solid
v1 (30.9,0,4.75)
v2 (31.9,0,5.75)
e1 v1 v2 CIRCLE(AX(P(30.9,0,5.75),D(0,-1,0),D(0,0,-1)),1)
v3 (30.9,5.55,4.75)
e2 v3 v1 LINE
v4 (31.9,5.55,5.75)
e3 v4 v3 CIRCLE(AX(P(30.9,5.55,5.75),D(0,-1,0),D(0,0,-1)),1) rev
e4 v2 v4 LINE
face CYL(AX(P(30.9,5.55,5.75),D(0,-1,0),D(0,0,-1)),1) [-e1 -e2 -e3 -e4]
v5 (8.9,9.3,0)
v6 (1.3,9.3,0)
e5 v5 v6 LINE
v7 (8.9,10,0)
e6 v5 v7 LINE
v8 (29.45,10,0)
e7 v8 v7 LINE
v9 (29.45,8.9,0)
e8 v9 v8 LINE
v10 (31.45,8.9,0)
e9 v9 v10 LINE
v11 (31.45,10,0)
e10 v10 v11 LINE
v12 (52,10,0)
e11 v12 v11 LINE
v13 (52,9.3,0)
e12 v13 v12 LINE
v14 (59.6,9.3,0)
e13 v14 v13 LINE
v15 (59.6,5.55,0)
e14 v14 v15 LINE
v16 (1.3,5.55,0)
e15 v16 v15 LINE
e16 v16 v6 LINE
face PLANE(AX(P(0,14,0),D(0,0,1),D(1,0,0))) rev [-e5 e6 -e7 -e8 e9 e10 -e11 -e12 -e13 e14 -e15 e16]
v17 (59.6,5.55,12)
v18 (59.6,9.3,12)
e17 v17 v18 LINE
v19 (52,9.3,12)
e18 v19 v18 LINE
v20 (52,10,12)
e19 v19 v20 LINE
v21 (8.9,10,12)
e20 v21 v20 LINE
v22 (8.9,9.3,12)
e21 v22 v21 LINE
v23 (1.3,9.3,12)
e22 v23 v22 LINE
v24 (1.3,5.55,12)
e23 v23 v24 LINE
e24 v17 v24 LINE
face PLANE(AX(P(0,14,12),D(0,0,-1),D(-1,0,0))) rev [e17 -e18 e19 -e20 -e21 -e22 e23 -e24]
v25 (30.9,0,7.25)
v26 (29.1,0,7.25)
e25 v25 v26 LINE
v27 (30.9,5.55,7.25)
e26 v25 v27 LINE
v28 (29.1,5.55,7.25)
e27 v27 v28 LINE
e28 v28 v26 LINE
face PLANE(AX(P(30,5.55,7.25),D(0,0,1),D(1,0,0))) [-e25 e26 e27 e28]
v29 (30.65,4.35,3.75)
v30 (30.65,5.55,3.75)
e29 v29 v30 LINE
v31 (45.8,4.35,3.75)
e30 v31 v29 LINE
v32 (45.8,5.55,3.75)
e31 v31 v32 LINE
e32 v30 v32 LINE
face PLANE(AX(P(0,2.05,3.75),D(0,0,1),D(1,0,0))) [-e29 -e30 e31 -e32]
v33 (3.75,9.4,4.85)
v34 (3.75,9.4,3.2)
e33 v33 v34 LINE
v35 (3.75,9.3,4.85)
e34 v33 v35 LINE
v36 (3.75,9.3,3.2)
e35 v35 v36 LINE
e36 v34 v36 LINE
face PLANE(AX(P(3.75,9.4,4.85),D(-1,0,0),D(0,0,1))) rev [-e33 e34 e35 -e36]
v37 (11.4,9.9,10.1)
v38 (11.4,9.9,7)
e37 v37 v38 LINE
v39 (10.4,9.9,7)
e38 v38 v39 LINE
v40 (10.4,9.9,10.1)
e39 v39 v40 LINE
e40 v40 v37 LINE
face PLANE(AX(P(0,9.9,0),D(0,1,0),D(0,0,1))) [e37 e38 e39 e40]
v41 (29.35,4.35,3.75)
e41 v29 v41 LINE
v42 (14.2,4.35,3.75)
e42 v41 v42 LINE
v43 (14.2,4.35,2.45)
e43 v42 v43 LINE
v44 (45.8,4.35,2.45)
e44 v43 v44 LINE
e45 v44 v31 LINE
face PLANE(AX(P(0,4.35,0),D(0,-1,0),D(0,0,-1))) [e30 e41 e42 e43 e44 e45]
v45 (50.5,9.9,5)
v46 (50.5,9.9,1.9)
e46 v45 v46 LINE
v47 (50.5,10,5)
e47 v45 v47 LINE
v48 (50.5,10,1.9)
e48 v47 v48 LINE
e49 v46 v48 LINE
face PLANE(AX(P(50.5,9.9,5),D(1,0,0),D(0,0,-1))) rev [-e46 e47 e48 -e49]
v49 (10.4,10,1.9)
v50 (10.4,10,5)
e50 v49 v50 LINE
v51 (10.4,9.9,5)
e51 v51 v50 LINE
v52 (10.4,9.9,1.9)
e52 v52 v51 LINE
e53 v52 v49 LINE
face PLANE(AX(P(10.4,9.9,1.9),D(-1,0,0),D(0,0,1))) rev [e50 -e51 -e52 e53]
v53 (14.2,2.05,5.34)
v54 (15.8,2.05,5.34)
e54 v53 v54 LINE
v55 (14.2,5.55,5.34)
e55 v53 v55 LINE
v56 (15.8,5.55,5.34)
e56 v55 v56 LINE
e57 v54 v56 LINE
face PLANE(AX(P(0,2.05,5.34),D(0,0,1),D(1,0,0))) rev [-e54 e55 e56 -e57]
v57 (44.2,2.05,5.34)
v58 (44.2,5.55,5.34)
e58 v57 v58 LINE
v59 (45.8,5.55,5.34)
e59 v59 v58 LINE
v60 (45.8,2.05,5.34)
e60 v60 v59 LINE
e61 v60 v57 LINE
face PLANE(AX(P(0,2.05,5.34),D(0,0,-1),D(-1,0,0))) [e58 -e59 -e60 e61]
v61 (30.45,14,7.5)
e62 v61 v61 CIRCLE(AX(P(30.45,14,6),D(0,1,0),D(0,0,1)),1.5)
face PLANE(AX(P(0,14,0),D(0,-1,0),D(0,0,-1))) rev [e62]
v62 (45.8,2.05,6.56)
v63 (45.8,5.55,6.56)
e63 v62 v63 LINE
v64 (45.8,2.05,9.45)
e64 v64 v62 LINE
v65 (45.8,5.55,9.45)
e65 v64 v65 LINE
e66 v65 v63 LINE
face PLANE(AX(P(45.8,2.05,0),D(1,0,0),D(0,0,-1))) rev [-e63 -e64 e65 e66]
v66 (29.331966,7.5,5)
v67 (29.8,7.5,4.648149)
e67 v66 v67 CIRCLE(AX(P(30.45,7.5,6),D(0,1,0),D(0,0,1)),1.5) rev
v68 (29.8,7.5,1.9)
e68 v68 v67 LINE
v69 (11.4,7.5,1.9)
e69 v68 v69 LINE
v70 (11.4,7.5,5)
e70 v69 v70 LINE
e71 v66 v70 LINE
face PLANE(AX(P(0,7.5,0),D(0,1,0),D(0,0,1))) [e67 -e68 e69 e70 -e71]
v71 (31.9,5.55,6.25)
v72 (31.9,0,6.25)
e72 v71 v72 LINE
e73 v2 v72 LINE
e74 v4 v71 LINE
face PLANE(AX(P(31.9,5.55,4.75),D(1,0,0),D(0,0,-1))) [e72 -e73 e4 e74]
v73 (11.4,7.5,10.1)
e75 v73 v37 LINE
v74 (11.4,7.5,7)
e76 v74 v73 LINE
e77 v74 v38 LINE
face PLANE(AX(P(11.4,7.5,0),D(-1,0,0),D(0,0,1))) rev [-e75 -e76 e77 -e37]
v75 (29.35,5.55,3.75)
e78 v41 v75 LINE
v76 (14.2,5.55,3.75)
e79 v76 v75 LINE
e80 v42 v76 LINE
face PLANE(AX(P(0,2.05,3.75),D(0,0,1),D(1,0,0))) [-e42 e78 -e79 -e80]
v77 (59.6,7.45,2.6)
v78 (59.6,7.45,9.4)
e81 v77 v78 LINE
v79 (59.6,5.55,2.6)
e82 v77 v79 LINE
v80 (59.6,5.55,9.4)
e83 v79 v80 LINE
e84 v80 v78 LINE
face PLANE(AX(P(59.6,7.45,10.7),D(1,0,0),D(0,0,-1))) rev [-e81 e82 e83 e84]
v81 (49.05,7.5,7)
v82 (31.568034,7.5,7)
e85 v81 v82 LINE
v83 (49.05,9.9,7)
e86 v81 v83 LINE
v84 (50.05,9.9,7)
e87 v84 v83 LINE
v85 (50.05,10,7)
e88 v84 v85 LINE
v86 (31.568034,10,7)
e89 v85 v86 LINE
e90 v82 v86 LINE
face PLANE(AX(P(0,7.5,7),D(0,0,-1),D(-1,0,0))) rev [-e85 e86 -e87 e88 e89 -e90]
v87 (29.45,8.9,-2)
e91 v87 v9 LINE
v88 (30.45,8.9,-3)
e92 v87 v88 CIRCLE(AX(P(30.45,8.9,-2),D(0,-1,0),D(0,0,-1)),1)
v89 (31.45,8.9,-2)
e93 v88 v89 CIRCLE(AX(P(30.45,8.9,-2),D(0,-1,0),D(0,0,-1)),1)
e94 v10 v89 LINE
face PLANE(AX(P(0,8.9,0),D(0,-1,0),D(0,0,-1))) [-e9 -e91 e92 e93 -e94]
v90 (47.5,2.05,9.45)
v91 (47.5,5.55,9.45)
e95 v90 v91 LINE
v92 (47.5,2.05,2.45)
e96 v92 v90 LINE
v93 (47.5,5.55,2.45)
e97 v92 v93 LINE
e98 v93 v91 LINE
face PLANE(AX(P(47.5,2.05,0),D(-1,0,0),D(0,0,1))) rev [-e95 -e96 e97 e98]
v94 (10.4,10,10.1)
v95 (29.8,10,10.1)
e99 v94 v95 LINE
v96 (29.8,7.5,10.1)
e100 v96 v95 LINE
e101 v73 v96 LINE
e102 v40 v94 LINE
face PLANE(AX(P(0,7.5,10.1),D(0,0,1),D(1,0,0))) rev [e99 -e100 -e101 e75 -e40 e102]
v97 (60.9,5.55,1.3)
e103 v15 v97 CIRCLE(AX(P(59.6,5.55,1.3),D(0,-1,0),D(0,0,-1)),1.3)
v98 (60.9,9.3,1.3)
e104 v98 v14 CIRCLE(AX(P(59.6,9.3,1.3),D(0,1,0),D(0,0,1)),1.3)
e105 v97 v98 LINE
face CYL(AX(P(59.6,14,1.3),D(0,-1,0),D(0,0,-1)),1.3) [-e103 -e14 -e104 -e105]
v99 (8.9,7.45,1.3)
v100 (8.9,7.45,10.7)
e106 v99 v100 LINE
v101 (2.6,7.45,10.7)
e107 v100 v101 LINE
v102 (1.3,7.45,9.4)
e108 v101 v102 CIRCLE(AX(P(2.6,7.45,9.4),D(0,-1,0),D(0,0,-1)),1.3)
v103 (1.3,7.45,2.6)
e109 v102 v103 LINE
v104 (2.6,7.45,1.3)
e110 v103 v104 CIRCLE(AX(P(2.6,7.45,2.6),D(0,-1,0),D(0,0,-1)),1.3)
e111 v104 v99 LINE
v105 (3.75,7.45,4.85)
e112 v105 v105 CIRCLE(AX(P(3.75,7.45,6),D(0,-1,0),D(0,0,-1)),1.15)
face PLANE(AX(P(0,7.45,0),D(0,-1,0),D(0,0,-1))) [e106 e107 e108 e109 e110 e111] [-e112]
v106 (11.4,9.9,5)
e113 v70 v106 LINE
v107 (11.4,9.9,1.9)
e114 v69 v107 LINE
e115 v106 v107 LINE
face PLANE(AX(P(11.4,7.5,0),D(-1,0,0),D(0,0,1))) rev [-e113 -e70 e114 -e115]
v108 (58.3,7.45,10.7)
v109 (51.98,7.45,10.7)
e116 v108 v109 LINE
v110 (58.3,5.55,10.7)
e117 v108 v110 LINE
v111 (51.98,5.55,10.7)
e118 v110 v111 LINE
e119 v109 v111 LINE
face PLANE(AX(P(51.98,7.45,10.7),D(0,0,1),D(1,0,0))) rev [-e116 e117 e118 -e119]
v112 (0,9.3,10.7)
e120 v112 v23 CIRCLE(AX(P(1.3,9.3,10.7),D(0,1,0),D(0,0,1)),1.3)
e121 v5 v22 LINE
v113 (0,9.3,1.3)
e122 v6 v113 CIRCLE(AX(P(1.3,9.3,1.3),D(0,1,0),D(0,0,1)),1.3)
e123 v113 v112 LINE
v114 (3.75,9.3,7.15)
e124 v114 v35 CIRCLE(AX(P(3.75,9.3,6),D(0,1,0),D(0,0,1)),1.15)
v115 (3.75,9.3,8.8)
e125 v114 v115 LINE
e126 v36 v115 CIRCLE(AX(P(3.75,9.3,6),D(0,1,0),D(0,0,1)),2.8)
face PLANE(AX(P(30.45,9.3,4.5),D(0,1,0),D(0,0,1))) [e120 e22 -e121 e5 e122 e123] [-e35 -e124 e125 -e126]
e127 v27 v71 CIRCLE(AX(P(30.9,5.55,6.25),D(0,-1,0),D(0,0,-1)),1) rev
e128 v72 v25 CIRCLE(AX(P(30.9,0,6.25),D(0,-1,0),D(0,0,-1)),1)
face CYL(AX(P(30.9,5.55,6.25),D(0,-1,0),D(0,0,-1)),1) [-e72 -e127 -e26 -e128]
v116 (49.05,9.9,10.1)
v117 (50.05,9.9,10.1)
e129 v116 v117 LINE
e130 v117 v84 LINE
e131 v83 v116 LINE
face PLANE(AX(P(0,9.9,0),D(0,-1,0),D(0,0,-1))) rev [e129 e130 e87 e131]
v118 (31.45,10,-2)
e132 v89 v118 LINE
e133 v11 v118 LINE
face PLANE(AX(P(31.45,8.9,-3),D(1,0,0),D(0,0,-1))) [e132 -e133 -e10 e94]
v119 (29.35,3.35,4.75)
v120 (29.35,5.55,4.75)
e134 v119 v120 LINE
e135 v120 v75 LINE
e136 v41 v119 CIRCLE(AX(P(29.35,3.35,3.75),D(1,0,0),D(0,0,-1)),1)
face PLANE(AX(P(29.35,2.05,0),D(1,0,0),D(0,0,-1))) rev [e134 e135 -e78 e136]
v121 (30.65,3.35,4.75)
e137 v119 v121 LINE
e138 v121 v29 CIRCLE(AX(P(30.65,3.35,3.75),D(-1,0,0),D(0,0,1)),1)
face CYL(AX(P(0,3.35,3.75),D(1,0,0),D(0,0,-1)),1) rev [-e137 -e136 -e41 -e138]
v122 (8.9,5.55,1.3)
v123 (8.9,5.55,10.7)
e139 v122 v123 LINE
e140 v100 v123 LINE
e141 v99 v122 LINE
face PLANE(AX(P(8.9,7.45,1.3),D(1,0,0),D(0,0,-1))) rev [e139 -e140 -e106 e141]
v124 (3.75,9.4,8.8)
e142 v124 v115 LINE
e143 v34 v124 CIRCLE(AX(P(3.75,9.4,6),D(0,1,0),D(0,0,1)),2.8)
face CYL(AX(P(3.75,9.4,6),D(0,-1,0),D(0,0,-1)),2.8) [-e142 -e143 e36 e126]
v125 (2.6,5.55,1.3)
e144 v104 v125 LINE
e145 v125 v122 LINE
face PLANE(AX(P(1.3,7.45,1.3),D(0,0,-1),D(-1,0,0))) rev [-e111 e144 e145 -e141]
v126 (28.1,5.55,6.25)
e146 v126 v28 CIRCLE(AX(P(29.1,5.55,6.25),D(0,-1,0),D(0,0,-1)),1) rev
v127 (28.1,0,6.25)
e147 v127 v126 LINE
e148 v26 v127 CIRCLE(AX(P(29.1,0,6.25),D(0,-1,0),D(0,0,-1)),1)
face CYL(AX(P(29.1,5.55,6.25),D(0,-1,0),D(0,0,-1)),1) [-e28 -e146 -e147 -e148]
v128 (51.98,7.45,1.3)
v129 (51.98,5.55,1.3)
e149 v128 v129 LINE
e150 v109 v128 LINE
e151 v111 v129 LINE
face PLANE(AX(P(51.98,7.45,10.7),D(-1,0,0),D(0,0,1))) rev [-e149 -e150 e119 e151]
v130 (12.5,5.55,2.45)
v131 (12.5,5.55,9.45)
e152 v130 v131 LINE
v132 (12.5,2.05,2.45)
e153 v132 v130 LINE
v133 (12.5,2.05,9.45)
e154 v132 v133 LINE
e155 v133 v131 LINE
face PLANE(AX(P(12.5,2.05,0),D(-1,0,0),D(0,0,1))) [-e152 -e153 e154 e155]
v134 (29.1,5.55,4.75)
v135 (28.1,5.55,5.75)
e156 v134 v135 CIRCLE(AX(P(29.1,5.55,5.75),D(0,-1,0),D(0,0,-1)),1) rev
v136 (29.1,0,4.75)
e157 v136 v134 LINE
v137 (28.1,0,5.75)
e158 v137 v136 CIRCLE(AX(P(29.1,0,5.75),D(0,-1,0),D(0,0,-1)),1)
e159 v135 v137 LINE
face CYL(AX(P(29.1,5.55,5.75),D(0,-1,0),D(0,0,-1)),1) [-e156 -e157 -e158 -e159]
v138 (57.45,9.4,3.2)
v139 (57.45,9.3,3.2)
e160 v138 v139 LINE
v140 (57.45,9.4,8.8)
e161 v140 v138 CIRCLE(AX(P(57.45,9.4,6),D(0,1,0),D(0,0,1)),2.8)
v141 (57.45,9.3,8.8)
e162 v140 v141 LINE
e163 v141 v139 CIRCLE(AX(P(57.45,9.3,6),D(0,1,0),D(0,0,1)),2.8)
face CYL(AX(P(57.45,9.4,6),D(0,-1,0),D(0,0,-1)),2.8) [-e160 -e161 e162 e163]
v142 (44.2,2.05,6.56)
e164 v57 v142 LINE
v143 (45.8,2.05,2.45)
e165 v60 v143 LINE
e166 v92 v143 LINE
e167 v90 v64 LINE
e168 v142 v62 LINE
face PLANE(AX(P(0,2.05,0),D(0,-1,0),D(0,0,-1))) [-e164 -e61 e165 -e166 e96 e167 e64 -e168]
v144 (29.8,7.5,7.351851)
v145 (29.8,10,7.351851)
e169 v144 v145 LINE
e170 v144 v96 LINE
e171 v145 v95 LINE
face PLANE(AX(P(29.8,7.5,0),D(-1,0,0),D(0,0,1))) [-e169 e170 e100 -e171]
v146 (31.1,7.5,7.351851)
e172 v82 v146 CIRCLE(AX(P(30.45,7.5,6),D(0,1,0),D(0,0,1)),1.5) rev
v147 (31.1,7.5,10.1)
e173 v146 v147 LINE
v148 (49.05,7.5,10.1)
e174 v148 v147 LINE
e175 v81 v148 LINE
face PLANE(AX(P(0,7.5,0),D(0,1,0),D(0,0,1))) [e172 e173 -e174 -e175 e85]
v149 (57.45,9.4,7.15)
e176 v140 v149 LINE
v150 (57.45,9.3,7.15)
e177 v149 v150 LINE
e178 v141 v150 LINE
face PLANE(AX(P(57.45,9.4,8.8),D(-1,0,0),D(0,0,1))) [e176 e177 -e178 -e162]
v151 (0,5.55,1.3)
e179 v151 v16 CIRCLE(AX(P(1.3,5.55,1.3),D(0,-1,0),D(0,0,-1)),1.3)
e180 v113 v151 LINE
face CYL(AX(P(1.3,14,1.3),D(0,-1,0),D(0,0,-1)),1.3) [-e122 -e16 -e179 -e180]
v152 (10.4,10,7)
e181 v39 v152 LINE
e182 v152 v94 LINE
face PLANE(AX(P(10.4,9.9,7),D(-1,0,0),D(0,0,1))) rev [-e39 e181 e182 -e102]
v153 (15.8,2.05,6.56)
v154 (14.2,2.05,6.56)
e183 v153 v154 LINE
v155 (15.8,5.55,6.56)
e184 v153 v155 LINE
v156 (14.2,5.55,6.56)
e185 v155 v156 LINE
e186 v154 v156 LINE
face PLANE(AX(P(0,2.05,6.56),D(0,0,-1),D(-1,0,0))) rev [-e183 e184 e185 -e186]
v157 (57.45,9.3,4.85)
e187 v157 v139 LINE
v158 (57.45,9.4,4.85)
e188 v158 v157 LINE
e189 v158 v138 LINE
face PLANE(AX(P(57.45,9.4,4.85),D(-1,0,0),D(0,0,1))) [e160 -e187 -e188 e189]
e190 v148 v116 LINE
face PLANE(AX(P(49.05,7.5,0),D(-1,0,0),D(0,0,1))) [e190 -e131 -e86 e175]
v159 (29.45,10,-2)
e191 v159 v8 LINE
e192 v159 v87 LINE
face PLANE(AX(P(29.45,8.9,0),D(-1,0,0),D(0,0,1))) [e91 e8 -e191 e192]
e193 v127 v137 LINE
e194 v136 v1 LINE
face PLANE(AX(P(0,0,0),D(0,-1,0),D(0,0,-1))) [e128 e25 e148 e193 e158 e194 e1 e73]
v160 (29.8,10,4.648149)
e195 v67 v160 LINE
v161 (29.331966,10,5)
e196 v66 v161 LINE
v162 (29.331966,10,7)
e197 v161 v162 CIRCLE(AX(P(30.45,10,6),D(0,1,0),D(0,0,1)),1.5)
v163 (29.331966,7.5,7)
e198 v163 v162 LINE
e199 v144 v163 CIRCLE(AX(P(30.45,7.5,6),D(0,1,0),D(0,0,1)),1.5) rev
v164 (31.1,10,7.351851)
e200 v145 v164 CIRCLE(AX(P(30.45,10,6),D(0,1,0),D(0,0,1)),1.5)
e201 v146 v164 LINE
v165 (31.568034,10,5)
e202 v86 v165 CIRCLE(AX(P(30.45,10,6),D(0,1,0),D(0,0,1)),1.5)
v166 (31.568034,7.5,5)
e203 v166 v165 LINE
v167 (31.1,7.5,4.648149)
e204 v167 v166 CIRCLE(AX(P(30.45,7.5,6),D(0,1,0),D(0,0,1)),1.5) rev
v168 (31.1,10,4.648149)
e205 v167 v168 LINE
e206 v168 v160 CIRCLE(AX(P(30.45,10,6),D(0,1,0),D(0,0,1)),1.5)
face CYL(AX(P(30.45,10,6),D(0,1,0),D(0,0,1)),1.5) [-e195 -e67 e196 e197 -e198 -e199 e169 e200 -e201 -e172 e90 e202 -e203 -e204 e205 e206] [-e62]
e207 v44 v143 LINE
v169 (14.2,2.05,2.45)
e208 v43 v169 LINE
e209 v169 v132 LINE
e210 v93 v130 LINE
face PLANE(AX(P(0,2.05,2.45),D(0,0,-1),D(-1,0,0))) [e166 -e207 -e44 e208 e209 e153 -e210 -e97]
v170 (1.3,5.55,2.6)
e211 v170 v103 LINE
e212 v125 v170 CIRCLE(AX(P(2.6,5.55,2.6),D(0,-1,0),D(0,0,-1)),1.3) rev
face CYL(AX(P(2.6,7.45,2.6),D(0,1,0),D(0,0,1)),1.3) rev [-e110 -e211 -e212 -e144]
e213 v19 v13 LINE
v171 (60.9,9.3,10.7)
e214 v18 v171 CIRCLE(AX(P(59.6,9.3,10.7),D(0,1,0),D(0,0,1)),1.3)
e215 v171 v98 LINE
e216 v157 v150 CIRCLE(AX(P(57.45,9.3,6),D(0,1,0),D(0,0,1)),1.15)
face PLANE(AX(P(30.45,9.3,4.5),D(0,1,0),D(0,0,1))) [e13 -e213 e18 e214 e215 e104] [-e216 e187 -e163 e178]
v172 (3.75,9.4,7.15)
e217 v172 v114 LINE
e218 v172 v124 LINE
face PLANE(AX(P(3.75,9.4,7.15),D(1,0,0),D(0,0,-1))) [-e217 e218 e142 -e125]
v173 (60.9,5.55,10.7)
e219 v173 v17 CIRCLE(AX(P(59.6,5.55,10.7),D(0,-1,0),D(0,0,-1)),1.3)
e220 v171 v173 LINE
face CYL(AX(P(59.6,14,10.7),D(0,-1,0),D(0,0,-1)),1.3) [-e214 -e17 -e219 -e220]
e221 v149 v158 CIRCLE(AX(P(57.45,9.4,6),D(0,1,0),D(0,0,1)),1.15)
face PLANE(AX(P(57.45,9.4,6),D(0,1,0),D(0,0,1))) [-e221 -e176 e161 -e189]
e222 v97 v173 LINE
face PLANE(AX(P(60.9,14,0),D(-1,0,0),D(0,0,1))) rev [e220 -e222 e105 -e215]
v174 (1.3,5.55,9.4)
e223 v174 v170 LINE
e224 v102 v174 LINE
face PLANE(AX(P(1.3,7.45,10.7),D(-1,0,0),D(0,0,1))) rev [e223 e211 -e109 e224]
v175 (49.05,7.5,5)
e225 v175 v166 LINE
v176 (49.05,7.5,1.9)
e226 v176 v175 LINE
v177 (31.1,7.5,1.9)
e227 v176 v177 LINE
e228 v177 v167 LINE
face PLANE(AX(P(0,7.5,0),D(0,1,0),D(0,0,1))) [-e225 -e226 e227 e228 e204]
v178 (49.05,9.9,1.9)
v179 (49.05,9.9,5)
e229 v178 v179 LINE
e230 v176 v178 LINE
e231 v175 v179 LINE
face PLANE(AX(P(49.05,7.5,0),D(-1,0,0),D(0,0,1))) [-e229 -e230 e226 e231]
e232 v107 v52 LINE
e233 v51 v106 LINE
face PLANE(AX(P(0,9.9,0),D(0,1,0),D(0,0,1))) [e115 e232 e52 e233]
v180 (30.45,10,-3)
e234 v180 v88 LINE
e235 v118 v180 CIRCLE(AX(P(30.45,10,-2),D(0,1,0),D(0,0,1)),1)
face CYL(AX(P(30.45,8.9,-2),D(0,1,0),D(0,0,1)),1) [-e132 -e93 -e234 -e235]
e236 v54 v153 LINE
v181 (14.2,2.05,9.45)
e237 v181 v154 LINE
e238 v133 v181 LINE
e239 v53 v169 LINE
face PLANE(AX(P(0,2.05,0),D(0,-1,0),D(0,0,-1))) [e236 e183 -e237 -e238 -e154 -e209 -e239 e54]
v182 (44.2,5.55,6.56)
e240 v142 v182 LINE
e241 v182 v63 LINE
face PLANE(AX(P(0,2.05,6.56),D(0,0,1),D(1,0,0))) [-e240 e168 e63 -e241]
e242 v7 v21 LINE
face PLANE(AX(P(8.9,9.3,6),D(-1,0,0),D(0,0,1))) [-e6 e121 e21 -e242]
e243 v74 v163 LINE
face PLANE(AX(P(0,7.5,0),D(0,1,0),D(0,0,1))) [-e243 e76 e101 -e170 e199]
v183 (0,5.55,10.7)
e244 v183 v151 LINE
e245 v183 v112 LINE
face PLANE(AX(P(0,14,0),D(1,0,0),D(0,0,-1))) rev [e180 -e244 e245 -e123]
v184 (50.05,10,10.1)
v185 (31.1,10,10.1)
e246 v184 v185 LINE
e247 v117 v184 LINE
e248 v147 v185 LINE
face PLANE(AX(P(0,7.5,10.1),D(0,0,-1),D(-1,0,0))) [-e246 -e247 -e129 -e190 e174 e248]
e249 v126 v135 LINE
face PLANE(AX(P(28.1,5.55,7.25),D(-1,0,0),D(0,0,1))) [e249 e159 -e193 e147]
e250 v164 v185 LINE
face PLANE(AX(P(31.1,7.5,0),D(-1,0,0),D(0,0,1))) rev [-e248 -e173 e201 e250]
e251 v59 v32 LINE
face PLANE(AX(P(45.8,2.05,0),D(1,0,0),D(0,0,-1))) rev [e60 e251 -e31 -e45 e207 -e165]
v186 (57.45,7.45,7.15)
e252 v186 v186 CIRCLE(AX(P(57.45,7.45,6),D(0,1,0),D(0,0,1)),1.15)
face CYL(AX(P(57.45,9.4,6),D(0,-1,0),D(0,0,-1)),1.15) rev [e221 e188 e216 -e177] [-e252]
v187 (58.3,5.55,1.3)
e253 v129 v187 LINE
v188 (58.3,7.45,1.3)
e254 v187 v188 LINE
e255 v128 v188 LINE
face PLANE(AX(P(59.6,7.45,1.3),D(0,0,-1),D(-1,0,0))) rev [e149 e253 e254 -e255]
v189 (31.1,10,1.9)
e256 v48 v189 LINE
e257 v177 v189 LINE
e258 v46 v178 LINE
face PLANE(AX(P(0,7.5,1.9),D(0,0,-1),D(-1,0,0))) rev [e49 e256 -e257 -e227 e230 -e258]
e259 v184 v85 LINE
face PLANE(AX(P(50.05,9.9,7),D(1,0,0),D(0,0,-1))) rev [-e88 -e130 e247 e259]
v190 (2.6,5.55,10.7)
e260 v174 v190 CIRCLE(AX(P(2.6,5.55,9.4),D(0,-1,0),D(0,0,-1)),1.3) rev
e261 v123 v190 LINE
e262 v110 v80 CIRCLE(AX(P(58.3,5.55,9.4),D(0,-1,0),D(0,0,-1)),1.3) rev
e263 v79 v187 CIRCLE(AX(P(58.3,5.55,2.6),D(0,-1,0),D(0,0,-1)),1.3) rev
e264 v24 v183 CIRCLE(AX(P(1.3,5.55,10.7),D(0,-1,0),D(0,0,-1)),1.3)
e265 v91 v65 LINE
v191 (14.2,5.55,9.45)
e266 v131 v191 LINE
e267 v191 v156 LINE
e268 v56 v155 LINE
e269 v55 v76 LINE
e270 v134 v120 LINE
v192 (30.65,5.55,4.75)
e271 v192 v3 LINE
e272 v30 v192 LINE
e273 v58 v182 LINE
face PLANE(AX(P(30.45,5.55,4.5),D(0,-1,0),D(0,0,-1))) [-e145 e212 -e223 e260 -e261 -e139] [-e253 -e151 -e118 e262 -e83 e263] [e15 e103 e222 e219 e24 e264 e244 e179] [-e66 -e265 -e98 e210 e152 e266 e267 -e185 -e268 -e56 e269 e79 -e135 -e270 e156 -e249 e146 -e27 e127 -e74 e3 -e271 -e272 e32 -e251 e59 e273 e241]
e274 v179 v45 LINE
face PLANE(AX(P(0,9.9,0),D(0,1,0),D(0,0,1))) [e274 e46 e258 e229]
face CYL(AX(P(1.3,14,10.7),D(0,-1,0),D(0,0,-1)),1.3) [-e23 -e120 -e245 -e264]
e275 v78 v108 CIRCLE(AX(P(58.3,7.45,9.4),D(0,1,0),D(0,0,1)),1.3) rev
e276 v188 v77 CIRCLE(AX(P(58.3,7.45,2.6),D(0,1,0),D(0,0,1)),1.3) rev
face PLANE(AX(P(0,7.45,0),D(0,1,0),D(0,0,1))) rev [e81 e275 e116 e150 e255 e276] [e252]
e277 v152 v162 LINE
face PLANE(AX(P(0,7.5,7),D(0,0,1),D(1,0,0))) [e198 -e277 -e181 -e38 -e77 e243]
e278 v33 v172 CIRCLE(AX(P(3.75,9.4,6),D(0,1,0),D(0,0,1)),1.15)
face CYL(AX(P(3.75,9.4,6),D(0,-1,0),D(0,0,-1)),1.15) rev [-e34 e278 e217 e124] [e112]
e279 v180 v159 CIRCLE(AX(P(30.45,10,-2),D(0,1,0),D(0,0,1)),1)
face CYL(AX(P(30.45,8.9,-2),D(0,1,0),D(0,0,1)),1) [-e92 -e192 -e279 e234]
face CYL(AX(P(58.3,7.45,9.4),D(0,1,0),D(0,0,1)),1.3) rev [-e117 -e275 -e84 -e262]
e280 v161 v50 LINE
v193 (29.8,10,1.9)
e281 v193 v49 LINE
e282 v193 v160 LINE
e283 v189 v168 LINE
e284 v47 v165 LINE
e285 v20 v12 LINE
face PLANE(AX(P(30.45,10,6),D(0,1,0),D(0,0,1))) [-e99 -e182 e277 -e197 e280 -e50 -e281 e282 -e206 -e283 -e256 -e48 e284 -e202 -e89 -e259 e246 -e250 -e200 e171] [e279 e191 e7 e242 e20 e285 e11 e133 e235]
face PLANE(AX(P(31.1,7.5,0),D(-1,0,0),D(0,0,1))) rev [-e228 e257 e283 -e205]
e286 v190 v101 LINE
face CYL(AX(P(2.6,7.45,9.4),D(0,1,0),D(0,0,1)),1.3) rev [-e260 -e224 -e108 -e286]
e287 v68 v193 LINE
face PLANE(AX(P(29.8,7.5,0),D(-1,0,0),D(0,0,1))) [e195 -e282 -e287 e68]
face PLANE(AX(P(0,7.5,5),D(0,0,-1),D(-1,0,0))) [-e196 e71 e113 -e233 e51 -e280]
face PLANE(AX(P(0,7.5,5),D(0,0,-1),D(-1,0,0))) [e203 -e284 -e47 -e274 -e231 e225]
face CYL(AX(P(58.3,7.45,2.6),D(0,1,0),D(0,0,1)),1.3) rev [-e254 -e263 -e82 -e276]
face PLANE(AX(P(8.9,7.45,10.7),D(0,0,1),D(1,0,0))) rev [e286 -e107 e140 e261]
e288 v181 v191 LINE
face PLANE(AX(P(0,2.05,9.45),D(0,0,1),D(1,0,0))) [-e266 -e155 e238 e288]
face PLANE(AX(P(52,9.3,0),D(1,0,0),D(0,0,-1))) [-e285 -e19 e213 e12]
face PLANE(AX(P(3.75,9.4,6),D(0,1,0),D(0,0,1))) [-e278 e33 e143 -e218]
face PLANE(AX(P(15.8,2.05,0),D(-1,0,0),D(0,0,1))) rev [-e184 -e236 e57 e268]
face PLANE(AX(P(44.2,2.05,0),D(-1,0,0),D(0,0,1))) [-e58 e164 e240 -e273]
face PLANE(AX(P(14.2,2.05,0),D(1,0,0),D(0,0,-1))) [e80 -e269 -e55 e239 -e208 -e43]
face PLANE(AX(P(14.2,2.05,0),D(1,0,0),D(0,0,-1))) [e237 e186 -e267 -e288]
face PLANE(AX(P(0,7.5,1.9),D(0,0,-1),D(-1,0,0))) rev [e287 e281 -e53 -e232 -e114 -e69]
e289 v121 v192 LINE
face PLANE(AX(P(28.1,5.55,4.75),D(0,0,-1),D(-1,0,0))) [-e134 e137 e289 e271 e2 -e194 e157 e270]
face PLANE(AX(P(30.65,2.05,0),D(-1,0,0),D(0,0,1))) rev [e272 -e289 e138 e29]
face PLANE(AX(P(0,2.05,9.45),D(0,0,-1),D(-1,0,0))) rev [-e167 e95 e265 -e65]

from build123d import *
from build123d.topology import SkipClean

# Parameters (mm, degrees)
CROQUIS1_W              = 60.9
CROQUIS1_H              = 12
SALIENTE_EXTRUIR1_DEPTH = 14
CROQUIS2_OUTSIDE_W      = 75.626
CROQUIS2_OUTSIDE_H      = 26.726
CROQUIS2_OUTSIDE_R      = 1.5
CORTAR_EXTRUIR1_DEPTH   = 4
SALIENTE_EXTRUIR3_DEPTH = 1.1
CROQUIS4_OUTSIDE_W      = 75.752
CROQUIS4_OUTSIDE_H      = 29.852
CORTAR_EXTRUIR2_DEPTH   = 0.7
CORTAR_EXTRUIR3_DEPTH   = 2.5
CROQUIS6_W              = 1.45
CROQUIS6_H              = 3.1
CROQUIS6_W_2            = 1
CORTAR_EXTRUIR4_DEPTH   = 0.1
REDONDEO1_R             = 1
REDONDEO2_R             = 1
SALIENTE_EXTRUIR4_DEPTH = 0.1
CORTAR_EXTRUIR5_REACH   = 64.764
CROQUIS8_R              = 1.15
CROQUIS9_OUTSIDE_W      = 75.752
CROQUIS9_OUTSIDE_H      = 29.852
CORTAR_EXTRUIR7_DEPTH   = 5.55
SALIENTE_EXTRUIR6_DEPTH = 3.5
CROQUIS12_W             = 31.6
CROQUIS12_H             = 1.3
CORTAR_EXTRUIR8_DEPTH   = 2.3
CROQUIS14_W             = 1.3
CROQUIS14_H             = 1
CORTAR_EXTRUIR9_DEPTH   = 2.3
REDONDEO3_R             = 1
CROQUIS15_W             = 7.62
CROQUIS15_H             = 9.4
CROQUIS15_W_2           = 7.6
CORTAR_EXTRUIR10_DEPTH  = 1.9
REDONDEO4_R             = 1.3
REDONDEO5_R             = 1.3
REDONDEO6_R             = 1.3
REDONDEO7_R             = 1


# Some blends are built 0.0001 mm under size
with BuildPart() as part:
    # Croquis1 → Saliente-Extruir1 (new body)
    with BuildSketch(Plane(origin=(0, 0, 0), x_dir=(1, 0, 0), z_dir=(0, 1, 0))):
        with Locations((30.45, -6)):
            Rectangle(CROQUIS1_W, CROQUIS1_H)
    extrude(amount=SALIENTE_EXTRUIR1_DEPTH)

    # Croquis2 outside → Cortar-Extruir1 (cut)
    with BuildSketch(Plane(origin=(0, 14, 0), x_dir=(1, 0, 0), z_dir=(0, 1, 0))):
        with Locations((30.45, -6)):
            Rectangle(CROQUIS2_OUTSIDE_W, CROQUIS2_OUTSIDE_H)
        with Locations(Location((30.45, -6, 0), (0, 0, 270))):
            Circle(CROQUIS2_OUTSIDE_R, mode=Mode.SUBTRACT)
    extrude(amount=-CORTAR_EXTRUIR1_DEPTH, mode=Mode.SUBTRACT)

    # Croquis3 → Saliente-Extruir3 (add)
    with BuildSketch(Plane(origin=(0, 10, 0), x_dir=(1, 0, 0), z_dir=(0, 1, 0))):
        Polygon((30.45, 0), (29.45, 0), (29.45, 3), (31.45, 3), (31.45, 0), align=None)
    extrude(amount=-SALIENTE_EXTRUIR3_DEPTH)

    # Croquis4 outside → Cortar-Extruir2 (cut)
    with BuildSketch(Plane(origin=(0, 10, 0), x_dir=(1, 0, 0), z_dir=(0, 1, 0))):
        with Locations((30.45, -4.5)):
            Rectangle(CROQUIS4_OUTSIDE_W, CROQUIS4_OUTSIDE_H)
        Polygon((8.9, -6), (8.9, 0), (29.45, 0), (29.45, 3), (31.45, 3), (31.45, 0), (52, 0), (52, -12), (8.9, -12), align=None, mode=Mode.SUBTRACT)
    extrude(amount=-CORTAR_EXTRUIR2_DEPTH, mode=Mode.SUBTRACT)

    # Croquis5 → Cortar-Extruir3 (cut)
    with SkipClean():  # the faces are left unmerged after this step: merging them gives an invalid solid
        with BuildSketch(Plane(origin=(0, 10, 0), x_dir=(1, 0, 0), z_dir=(0, 1, 0))):
            with BuildLine():
                ThreePointArc((29.331966011, -5), (29.548647819, -4.801015327), (29.8, -4.648149417))
                Line((29.8, -4.648149417), (29.8, -1.9))
                Line((29.8, -1.9), (11.4, -1.9))
                Line((11.4, -1.9), (11.4, -5))
                Line((11.4, -5), (29.331966011, -5))
            make_face()
            with BuildLine():
                ThreePointArc((29.8, -7.351850583), (29.548647819, -7.198984673), (29.331966011, -7))
                Line((29.331966011, -7), (11.4, -7))
                Line((11.4, -7), (11.4, -10.1))
                Line((11.4, -10.1), (29.8, -10.1))
                Line((29.8, -10.1), (29.8, -7.351850583))
            make_face()
            with BuildLine():
                Line((49.05, -7), (31.568033989, -7))
                ThreePointArc((31.568033989, -7), (31.351352181, -7.198984673), (31.1, -7.351850583))
                Line((31.1, -7.351850583), (31.1, -10.1))
                Line((31.1, -10.1), (49.05, -10.1))
                Line((49.05, -10.1), (49.05, -7))
            make_face()
            with BuildLine():
                Line((49.05, -5), (49.05, -1.9))
                Line((49.05, -1.9), (31.1, -1.9))
                Line((31.1, -1.9), (31.1, -4.648149417))
                ThreePointArc((31.1, -4.648149417), (31.351352181, -4.801015327), (31.568033989, -5))
                Line((31.568033989, -5), (49.05, -5))
            make_face()
        extrude(amount=-CORTAR_EXTRUIR3_DEPTH, mode=Mode.SUBTRACT)

    # Croquis6 → Cortar-Extruir4 (cut)
    with SkipClean():  # the faces are left unmerged after this step: merging them gives an invalid solid
        with BuildSketch(Plane(origin=(0, 10, 0), x_dir=(1, 0, 0), z_dir=(0, 1, 0))):
            with Locations((49.775, -3.45)):
                Rectangle(CROQUIS6_W, CROQUIS6_H)
            with Locations((49.55, -8.55)):
                Rectangle(CROQUIS6_W_2, CROQUIS6_H)
            with Locations((10.9, -3.45)):
                Rectangle(CROQUIS6_W_2, CROQUIS6_H)
            with Locations((10.9, -8.55)):
                Rectangle(CROQUIS6_W_2, CROQUIS6_H)
        extrude(amount=-CORTAR_EXTRUIR4_DEPTH, mode=Mode.SUBTRACT)

    # Redondeo1
    redondeo1_edges = [part.edges().sort_by_distance(p)[0] for p in [
        (31.45, 9.45, -3),
    ]]
    fillet(redondeo1_edges, radius=REDONDEO1_R)

    # Redondeo2
    redondeo2_edges = [part.edges().sort_by_distance(p)[0] for p in [
        (29.45, 9.45, -3),
    ]]
    fillet(redondeo2_edges, radius=REDONDEO2_R - 0.0001)  # a hair under: the kernel refuses the full size

    # Croquis7 → Saliente-Extruir4 (add)
    with BuildSketch(Plane(origin=(0, 9.3, 0), x_dir=(1, 0, 0), z_dir=(0, 1, 0))):
        with BuildLine():
            Line((57.45, -8.8), (57.45, -7.15))
            ThreePointArc((57.45, -7.15), (58.6, -6), (57.45, -4.85))
            Line((57.45, -4.85), (57.45, -3.2))
            ThreePointArc((57.45, -3.2), (60.25, -6), (57.45, -8.8))
        make_face()
        with BuildLine():
            Line((3.75, -4.85), (3.75, -3.2))
            ThreePointArc((3.75, -3.2), (0.95, -6), (3.75, -8.8))
            Line((3.75, -8.8), (3.75, -7.15))
            ThreePointArc((3.75, -7.15), (2.6, -6), (3.75, -4.85))
        make_face()
    extrude(amount=SALIENTE_EXTRUIR4_DEPTH)

    # Croquis8 → Cortar-Extruir5 (cut, up to next)
    with BuildSketch(Plane(origin=(0, 9.3, 0), x_dir=(1, 0, 0), z_dir=(0, 1, 0)), mode=Mode.PRIVATE) as cortar_extruir5_sk1:
        with Locations(Location((57.45, -6, 0), (0, 0, 90))):
            Circle(CROQUIS8_R)
    cortar_extruir5_tool1 = extrude(cortar_extruir5_sk1.sketch, amount=-CORTAR_EXTRUIR5_REACH, mode=Mode.PRIVATE) & part.part
    # Croquis8 → Cortar-Extruir5 (cut, up to next)
    with BuildSketch(Plane(origin=(0, 9.3, 0), x_dir=(1, 0, 0), z_dir=(0, 1, 0)), mode=Mode.PRIVATE) as cortar_extruir5_sk2:
        with Locations(Location((3.75, -6, 0), (0, 0, 90))):
            Circle(CROQUIS8_R)
    cortar_extruir5_tool2 = extrude(cortar_extruir5_sk2.sketch, amount=-CORTAR_EXTRUIR5_REACH, mode=Mode.PRIVATE) & part.part
    add(cortar_extruir5_tool1.solids().sort_by_distance((57.45, 9.3, 6))[0], mode=Mode.SUBTRACT)
    add(cortar_extruir5_tool2.solids().sort_by_distance((3.75, 9.3, 6))[0], mode=Mode.SUBTRACT)

    # Croquis9 outside → Cortar-Extruir7 (cut)
    with BuildSketch(Plane.XZ):
        with Locations((30.45, 4.5)):
            Rectangle(CROQUIS9_OUTSIDE_W, CROQUIS9_OUTSIDE_H)
        Polygon((30, 7.25), (28.1, 7.25), (28.1, 4.75), (31.9, 4.75), (31.9, 7.25), align=None, mode=Mode.SUBTRACT)
    extrude(amount=-CORTAR_EXTRUIR7_DEPTH, mode=Mode.SUBTRACT)

    # Croquis10 → Saliente-Extruir6 (add)
    with BuildSketch(Plane.XZ.offset(-5.55)):
        Polygon((30.65, 4.75), (29.35, 4.75), (29.35, 3.75), (14.2, 3.75), (14.2, 5.34), (15.8, 5.34), (15.8, 5.95), (15.8, 6.56), (14.2, 6.56), (14.2, 9.45), (12.5, 9.45), (12.5, 2.45), (29.35, 2.45), (30, 2.45), (30.65, 2.45), (47.5, 2.45), (47.5, 9.45), (45.8, 9.45), (45.8, 6.56), (44.2, 6.56), (44.2, 5.95), (44.2, 5.34), (45.8, 5.34), (45.8, 3.75), (30.65, 3.75), align=None)
    extrude(amount=SALIENTE_EXTRUIR6_DEPTH)

    # Croquis12 → Cortar-Extruir8 (cut)
    with BuildSketch(Plane.XZ.offset(-2.05)):
        with Locations((30, 3.1)):
            Rectangle(CROQUIS12_W, CROQUIS12_H)
    extrude(amount=-CORTAR_EXTRUIR8_DEPTH, mode=Mode.SUBTRACT)

    # Croquis14 → Cortar-Extruir9 (cut)
    with BuildSketch(Plane.XZ.offset(-2.05)):
        with Locations((30, 4.25)):
            Rectangle(CROQUIS14_W, CROQUIS14_H)
    extrude(amount=-CORTAR_EXTRUIR9_DEPTH, mode=Mode.SUBTRACT)

    # Redondeo3
    # the kernel refuses this fillet: 1 mm, written as the material it adds along each edge
    with BuildSketch(Plane(origin=(29.35, 4.35, 4.75), x_dir=(0, -1, 0), z_dir=(1, 0, 0))) as redondeo3_piece_1:
        with BuildLine():
            CenterArc((REDONDEO3_R, REDONDEO3_R), REDONDEO3_R, 180, 90)
            Line((0, REDONDEO3_R), (0, 0))
            Line((0, 0), (REDONDEO3_R, 0))
        make_face()
    extrude(amount=1.3)

    # Croquis15 → Cortar-Extruir10 (cut)
    with BuildSketch(Plane.XZ.offset(-5.55)):
        with Locations((55.79, 6)):
            Rectangle(CROQUIS15_W, CROQUIS15_H)
        with Locations((5.1, 6)):
            Rectangle(CROQUIS15_W_2, CROQUIS15_H)
    extrude(amount=-CORTAR_EXTRUIR10_DEPTH, mode=Mode.SUBTRACT)

    # Redondeo4
    redondeo4_edges = [part.edges().sort_by_distance(p)[0] for p in [
        (60.9, 7.425, 0),
    ]]
    fillet(redondeo4_edges, radius=REDONDEO4_R)

    # Redondeo5
    redondeo5_edges = [part.edges().sort_by_distance(p)[0] for p in [
        (60.9, 7.425, 12),
        (0, 7.425, 12),
        (0, 7.425, 0),
    ]]
    fillet(redondeo5_edges, radius=REDONDEO5_R)

    # Redondeo6
    redondeo6_edges = [part.edges().sort_by_distance(p)[0] for p in [
        (59.6, 6.5, 10.7),
        (59.6, 6.5, 1.3),
        (1.3, 6.5, 1.3),
        (1.3, 6.5, 10.7),
    ]]
    fillet(redondeo6_edges, radius=REDONDEO6_R)

    # Redondeo7
    redondeo7_edges = [part.edges().sort_by_distance(p)[0] for p in [
        (31.9, 2.775, 4.75),
        (28.1, 2.775, 4.75),
        (28.1, 2.775, 7.25),
        (31.9, 2.775, 7.25),
    ]]
    fillet(redondeo7_edges, radius=REDONDEO7_R)


solid = part.part
